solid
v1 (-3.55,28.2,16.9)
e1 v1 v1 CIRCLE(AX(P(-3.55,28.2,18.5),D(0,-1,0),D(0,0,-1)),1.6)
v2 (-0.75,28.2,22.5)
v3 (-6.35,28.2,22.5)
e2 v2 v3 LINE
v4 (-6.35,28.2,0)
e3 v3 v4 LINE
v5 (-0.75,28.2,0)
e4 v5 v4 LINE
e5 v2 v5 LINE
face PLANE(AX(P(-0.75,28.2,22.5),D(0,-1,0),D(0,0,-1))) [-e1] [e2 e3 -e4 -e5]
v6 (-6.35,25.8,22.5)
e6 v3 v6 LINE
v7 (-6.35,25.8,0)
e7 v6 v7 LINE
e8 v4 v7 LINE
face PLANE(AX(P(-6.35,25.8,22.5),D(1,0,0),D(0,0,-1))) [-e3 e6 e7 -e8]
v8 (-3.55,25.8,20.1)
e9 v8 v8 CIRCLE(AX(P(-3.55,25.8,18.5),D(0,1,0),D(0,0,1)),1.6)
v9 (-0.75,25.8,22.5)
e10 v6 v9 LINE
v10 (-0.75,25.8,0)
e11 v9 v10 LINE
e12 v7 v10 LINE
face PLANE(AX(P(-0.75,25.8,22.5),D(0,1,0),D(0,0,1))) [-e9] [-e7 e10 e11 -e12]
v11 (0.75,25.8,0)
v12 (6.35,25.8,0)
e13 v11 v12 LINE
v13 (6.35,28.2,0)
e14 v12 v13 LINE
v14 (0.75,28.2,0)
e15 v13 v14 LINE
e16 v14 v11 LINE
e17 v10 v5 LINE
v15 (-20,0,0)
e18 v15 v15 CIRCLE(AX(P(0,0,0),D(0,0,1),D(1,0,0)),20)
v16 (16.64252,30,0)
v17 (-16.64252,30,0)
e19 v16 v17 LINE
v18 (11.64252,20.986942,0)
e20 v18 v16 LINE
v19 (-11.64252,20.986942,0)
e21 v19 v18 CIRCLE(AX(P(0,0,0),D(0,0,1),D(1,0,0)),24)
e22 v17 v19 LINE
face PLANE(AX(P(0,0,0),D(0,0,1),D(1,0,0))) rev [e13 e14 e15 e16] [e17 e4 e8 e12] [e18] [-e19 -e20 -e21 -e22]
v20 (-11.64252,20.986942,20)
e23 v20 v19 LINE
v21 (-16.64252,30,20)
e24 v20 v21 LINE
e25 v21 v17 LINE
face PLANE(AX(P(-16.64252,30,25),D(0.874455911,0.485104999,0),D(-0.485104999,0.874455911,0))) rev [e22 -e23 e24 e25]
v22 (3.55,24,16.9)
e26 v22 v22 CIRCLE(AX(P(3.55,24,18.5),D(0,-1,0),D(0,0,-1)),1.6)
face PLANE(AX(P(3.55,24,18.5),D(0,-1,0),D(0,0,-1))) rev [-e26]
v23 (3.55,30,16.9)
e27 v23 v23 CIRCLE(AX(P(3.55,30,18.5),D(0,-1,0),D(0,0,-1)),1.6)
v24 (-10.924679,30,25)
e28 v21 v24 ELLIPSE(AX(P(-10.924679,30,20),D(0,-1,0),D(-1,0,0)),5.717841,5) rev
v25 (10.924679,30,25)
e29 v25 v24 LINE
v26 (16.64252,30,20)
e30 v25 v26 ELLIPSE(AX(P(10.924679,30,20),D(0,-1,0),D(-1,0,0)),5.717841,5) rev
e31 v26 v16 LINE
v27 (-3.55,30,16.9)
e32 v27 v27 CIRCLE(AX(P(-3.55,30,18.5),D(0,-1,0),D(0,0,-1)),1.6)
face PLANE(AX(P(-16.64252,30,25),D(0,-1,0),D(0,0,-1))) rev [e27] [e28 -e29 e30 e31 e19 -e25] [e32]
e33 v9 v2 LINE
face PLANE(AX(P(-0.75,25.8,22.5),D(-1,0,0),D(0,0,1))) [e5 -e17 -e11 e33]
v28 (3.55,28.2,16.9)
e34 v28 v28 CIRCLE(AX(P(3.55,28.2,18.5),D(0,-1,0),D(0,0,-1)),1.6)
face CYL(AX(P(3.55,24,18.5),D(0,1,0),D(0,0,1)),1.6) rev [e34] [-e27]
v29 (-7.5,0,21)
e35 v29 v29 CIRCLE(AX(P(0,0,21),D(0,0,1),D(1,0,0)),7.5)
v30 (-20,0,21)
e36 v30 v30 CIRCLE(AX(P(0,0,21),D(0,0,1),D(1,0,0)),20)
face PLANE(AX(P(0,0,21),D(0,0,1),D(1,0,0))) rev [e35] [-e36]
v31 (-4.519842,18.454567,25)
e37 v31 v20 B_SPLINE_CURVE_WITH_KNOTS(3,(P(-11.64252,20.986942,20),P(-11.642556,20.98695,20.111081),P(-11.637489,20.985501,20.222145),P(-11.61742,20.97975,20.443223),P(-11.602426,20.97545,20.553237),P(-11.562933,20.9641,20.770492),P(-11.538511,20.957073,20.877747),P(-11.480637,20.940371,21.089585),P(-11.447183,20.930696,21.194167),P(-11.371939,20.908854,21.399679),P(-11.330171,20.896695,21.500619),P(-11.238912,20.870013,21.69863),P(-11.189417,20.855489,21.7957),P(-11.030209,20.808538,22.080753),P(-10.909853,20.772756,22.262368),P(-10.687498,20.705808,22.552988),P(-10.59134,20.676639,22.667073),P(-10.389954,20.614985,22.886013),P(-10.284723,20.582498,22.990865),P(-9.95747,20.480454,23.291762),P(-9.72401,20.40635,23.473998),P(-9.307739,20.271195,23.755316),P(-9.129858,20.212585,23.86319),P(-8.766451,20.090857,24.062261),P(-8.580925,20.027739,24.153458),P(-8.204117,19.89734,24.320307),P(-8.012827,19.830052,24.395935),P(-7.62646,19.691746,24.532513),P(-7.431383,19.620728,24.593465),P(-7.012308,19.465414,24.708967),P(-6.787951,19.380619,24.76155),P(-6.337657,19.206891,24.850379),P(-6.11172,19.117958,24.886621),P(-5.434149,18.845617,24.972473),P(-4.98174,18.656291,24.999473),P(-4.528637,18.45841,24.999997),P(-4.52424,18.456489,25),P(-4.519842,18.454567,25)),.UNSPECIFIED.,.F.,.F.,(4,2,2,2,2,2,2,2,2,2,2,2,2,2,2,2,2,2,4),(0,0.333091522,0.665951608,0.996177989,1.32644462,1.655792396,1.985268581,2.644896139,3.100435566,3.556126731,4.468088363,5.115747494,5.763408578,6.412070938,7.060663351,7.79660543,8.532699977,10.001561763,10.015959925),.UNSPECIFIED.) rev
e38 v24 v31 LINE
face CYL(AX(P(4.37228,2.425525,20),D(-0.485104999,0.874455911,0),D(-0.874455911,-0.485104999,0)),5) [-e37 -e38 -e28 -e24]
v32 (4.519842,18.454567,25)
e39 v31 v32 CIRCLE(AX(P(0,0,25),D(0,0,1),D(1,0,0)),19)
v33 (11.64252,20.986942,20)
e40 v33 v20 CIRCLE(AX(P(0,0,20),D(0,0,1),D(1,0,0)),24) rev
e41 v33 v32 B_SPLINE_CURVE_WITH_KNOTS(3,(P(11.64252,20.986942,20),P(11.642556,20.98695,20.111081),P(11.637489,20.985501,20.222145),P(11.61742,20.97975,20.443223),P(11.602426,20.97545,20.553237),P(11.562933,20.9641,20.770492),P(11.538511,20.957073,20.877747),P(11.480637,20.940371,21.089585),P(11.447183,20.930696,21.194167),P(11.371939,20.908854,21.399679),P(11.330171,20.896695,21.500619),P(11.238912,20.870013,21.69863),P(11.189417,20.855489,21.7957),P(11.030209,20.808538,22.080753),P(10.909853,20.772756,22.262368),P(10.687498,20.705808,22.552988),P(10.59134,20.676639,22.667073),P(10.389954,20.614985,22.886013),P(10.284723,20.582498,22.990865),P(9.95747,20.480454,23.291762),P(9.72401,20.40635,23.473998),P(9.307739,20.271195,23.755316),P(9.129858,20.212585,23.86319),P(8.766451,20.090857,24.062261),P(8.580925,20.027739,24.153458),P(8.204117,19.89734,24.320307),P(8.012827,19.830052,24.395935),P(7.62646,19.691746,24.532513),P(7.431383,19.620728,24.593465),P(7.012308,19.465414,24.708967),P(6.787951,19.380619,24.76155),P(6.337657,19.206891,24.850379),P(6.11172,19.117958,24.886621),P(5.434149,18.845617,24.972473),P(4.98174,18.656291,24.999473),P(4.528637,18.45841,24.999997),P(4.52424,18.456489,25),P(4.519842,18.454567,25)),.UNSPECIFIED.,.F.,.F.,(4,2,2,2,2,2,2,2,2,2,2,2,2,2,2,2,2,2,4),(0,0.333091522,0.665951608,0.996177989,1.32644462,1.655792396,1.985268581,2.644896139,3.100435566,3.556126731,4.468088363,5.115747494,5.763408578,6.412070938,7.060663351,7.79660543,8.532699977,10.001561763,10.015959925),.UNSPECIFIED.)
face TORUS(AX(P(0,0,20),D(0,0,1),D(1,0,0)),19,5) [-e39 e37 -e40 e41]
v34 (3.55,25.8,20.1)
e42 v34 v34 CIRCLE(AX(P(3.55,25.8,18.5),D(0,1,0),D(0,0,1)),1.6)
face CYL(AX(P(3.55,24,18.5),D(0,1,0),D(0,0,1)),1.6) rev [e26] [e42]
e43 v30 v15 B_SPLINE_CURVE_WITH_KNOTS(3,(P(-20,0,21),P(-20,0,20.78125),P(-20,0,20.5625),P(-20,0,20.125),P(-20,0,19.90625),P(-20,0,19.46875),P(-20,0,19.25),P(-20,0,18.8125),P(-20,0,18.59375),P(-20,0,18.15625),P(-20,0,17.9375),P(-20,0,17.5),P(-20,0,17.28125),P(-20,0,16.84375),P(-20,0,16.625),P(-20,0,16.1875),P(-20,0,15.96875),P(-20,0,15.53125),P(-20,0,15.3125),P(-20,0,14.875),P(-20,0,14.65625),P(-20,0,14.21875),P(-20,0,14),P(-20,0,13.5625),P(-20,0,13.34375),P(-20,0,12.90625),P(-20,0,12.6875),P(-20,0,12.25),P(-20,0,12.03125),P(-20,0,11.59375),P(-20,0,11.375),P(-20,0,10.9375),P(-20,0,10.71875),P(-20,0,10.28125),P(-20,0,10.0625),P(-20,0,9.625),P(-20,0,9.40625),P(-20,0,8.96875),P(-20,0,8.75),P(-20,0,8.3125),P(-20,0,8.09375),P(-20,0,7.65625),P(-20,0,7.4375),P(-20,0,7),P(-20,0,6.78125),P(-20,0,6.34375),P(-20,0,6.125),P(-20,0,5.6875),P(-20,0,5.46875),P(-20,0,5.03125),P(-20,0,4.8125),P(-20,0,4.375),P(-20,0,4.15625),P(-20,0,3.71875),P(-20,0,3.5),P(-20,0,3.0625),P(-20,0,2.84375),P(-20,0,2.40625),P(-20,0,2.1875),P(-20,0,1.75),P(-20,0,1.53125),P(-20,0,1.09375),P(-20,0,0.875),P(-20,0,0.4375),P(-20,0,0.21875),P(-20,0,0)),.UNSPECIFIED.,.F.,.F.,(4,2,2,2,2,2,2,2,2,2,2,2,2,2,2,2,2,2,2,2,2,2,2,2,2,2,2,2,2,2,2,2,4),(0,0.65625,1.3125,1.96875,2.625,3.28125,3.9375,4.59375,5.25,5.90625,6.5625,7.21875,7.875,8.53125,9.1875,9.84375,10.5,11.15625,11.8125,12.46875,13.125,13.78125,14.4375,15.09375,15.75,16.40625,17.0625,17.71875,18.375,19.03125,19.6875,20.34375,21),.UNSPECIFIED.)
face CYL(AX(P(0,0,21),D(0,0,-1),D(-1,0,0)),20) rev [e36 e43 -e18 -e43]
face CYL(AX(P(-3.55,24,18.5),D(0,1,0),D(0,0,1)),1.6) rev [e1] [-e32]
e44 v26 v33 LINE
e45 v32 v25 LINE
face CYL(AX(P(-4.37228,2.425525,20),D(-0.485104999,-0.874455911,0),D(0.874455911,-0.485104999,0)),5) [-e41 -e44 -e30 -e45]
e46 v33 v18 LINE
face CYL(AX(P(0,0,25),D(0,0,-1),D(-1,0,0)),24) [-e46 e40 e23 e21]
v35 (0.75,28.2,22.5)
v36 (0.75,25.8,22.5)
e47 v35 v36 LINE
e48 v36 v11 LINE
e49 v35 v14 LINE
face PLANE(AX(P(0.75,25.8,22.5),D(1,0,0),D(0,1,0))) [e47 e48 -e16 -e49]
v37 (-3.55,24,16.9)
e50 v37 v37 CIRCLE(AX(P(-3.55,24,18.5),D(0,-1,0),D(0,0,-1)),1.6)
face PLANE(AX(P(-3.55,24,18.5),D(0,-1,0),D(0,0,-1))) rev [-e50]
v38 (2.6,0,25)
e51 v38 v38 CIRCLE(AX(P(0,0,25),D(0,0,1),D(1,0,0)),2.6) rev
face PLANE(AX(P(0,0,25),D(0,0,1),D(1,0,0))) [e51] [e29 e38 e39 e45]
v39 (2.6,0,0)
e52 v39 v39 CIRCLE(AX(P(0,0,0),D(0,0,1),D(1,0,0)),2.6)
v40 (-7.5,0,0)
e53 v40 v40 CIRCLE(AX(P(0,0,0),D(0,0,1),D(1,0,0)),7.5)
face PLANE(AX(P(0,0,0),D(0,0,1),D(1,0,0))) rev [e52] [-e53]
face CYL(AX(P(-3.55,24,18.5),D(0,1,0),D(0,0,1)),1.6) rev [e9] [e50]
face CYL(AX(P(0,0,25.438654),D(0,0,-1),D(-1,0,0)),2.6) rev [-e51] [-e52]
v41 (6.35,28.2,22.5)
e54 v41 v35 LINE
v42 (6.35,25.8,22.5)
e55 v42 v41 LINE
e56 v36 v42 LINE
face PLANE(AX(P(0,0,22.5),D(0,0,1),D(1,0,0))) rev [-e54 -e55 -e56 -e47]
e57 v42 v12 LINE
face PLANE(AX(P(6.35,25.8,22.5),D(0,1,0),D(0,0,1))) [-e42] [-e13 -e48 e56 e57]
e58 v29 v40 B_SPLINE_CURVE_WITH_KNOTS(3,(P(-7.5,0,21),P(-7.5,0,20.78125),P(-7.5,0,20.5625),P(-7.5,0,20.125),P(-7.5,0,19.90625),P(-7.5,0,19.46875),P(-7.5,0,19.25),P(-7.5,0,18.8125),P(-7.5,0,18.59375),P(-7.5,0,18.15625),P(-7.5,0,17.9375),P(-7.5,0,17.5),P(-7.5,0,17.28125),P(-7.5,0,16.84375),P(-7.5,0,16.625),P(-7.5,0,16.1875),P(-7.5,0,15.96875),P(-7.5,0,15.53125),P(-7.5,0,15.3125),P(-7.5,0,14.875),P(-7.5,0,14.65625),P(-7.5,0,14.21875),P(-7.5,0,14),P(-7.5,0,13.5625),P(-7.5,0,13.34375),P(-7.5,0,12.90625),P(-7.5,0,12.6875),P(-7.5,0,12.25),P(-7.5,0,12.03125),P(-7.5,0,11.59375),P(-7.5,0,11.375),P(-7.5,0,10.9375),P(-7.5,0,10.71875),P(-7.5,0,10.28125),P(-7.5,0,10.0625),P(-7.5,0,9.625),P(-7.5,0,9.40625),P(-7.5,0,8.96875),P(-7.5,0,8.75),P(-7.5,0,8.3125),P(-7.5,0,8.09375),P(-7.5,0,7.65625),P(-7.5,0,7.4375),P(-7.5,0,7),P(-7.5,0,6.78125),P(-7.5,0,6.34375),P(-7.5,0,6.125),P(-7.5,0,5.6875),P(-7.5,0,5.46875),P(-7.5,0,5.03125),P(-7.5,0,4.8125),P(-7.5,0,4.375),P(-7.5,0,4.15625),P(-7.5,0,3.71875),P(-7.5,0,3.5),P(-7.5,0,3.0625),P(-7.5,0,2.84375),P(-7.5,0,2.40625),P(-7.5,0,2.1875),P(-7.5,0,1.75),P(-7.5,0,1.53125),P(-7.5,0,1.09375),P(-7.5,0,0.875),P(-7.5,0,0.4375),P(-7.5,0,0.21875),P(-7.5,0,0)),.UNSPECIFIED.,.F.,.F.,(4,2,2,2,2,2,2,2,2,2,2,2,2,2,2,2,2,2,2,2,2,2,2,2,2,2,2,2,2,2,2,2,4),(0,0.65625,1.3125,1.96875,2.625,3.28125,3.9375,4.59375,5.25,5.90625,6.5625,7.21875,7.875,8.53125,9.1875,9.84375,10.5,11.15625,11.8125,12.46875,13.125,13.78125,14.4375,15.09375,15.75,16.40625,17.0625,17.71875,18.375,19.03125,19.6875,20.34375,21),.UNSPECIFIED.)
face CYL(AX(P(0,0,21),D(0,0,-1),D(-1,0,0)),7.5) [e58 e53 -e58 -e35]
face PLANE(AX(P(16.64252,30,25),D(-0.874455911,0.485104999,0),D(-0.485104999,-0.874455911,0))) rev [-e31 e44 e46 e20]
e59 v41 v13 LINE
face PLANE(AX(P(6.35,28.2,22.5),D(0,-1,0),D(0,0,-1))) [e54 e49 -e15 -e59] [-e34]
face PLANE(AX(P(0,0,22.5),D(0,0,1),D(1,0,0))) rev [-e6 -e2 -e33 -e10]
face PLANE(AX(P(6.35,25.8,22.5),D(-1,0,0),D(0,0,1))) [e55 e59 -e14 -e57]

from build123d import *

# Parameters (mm, degrees)
BOSS_EXTRUDE1_DEPTH = 25
FILLET1_R           = 5
SKETCH2_R           = 2.6
CUT_EXTRUDE1_DEPTH  = 46.836666718
SKETCH4_R           = 20
SKETCH4_R_2         = 7.5
CUT_EXTRUDE2_DEPTH  = 21
CUT_EXTRUDE3_START  = 30
SKETCH5_R           = 1.6
CUT_EXTRUDE3_DEPTH  = 6
SKETCH6_W           = 5.6
SKETCH6_H           = 2.4
CUT_EXTRUDE4_DEPTH  = 22.5


with BuildPart() as part:
    # Sketch1 → Boss-Extrude1 (new body)
    with BuildSketch(Plane.XY):
        with BuildLine():
            Line((-16.642519968, 30), (16.642519968, 30))
            Line((16.642519968, 30), (11.642519968, 20.986941864))
            ThreePointArc((11.642519968, 20.986941864), (0, -24), (-11.642519968, 20.986941864))
            Line((-11.642519968, 20.986941864), (-16.642519968, 30))
        make_face()
    extrude(amount=BOSS_EXTRUDE1_DEPTH)

    # Fillet1
    fillet1_edges = [part.edges().sort_by_distance(p)[0] for p in [
        (-14.142519968, 25.493470932, 25),
    ]]
    fillet(fillet1_edges, radius=FILLET1_R)
    fillet1_2_edges = [part.edges().sort_by_distance(p)[0] for p in [
        (14.142519968, 25.493470932, 25),
    ]]
    fillet(fillet1_2_edges, radius=FILLET1_R)
    fillet1_3_edges = [part.edges().sort_by_distance(p)[0] for p in [
        (0, -24, 25),
    ]]
    fillet(fillet1_3_edges, radius=FILLET1_R - 0.0001)  # a hair under: the kernel refuses the full size

    # Sketch2 → Cut-Extrude1 (cut, through all)
    with BuildSketch(Plane.XY):
        Circle(SKETCH2_R)
    extrude(amount=CUT_EXTRUDE1_DEPTH, mode=Mode.SUBTRACT)

    # Sketch4 → Cut-Extrude2 (cut)
    with BuildSketch(Plane.XY):
        with Locations(Location((0, 0, 0), (0, 0, 180))):
            Circle(SKETCH4_R)
        with Locations(Location((0, 0, 0), (0, 0, 180))):
            Circle(SKETCH4_R_2, mode=Mode.SUBTRACT)
    extrude(amount=CUT_EXTRUDE2_DEPTH, mode=Mode.SUBTRACT)

    # Sketch5 → Cut-Extrude3 (cut)
    with BuildSketch(Plane(origin=(0, 0, 0), x_dir=(1, 0, 0), z_dir=(0, 1, 0)).offset(CUT_EXTRUDE3_START)):
        with Locations(Location((-3.55, -18.5, 0), (0, 0, 90))):
            Circle(SKETCH5_R)
        with Locations(Location((3.55, -18.5, 0), (0, 0, 90))):
            Circle(SKETCH5_R)
    extrude(amount=-CUT_EXTRUDE3_DEPTH, mode=Mode.SUBTRACT)

    # Sketch6 → Cut-Extrude4 (cut)
    with BuildSketch(Plane.XY):
        with Locations((3.55, 27)):
            Rectangle(SKETCH6_W, SKETCH6_H)
        with Locations((-3.55, 27)):
            Rectangle(SKETCH6_W, SKETCH6_H)
    extrude(amount=CUT_EXTRUDE4_DEPTH, mode=Mode.SUBTRACT)


solid = part.part
